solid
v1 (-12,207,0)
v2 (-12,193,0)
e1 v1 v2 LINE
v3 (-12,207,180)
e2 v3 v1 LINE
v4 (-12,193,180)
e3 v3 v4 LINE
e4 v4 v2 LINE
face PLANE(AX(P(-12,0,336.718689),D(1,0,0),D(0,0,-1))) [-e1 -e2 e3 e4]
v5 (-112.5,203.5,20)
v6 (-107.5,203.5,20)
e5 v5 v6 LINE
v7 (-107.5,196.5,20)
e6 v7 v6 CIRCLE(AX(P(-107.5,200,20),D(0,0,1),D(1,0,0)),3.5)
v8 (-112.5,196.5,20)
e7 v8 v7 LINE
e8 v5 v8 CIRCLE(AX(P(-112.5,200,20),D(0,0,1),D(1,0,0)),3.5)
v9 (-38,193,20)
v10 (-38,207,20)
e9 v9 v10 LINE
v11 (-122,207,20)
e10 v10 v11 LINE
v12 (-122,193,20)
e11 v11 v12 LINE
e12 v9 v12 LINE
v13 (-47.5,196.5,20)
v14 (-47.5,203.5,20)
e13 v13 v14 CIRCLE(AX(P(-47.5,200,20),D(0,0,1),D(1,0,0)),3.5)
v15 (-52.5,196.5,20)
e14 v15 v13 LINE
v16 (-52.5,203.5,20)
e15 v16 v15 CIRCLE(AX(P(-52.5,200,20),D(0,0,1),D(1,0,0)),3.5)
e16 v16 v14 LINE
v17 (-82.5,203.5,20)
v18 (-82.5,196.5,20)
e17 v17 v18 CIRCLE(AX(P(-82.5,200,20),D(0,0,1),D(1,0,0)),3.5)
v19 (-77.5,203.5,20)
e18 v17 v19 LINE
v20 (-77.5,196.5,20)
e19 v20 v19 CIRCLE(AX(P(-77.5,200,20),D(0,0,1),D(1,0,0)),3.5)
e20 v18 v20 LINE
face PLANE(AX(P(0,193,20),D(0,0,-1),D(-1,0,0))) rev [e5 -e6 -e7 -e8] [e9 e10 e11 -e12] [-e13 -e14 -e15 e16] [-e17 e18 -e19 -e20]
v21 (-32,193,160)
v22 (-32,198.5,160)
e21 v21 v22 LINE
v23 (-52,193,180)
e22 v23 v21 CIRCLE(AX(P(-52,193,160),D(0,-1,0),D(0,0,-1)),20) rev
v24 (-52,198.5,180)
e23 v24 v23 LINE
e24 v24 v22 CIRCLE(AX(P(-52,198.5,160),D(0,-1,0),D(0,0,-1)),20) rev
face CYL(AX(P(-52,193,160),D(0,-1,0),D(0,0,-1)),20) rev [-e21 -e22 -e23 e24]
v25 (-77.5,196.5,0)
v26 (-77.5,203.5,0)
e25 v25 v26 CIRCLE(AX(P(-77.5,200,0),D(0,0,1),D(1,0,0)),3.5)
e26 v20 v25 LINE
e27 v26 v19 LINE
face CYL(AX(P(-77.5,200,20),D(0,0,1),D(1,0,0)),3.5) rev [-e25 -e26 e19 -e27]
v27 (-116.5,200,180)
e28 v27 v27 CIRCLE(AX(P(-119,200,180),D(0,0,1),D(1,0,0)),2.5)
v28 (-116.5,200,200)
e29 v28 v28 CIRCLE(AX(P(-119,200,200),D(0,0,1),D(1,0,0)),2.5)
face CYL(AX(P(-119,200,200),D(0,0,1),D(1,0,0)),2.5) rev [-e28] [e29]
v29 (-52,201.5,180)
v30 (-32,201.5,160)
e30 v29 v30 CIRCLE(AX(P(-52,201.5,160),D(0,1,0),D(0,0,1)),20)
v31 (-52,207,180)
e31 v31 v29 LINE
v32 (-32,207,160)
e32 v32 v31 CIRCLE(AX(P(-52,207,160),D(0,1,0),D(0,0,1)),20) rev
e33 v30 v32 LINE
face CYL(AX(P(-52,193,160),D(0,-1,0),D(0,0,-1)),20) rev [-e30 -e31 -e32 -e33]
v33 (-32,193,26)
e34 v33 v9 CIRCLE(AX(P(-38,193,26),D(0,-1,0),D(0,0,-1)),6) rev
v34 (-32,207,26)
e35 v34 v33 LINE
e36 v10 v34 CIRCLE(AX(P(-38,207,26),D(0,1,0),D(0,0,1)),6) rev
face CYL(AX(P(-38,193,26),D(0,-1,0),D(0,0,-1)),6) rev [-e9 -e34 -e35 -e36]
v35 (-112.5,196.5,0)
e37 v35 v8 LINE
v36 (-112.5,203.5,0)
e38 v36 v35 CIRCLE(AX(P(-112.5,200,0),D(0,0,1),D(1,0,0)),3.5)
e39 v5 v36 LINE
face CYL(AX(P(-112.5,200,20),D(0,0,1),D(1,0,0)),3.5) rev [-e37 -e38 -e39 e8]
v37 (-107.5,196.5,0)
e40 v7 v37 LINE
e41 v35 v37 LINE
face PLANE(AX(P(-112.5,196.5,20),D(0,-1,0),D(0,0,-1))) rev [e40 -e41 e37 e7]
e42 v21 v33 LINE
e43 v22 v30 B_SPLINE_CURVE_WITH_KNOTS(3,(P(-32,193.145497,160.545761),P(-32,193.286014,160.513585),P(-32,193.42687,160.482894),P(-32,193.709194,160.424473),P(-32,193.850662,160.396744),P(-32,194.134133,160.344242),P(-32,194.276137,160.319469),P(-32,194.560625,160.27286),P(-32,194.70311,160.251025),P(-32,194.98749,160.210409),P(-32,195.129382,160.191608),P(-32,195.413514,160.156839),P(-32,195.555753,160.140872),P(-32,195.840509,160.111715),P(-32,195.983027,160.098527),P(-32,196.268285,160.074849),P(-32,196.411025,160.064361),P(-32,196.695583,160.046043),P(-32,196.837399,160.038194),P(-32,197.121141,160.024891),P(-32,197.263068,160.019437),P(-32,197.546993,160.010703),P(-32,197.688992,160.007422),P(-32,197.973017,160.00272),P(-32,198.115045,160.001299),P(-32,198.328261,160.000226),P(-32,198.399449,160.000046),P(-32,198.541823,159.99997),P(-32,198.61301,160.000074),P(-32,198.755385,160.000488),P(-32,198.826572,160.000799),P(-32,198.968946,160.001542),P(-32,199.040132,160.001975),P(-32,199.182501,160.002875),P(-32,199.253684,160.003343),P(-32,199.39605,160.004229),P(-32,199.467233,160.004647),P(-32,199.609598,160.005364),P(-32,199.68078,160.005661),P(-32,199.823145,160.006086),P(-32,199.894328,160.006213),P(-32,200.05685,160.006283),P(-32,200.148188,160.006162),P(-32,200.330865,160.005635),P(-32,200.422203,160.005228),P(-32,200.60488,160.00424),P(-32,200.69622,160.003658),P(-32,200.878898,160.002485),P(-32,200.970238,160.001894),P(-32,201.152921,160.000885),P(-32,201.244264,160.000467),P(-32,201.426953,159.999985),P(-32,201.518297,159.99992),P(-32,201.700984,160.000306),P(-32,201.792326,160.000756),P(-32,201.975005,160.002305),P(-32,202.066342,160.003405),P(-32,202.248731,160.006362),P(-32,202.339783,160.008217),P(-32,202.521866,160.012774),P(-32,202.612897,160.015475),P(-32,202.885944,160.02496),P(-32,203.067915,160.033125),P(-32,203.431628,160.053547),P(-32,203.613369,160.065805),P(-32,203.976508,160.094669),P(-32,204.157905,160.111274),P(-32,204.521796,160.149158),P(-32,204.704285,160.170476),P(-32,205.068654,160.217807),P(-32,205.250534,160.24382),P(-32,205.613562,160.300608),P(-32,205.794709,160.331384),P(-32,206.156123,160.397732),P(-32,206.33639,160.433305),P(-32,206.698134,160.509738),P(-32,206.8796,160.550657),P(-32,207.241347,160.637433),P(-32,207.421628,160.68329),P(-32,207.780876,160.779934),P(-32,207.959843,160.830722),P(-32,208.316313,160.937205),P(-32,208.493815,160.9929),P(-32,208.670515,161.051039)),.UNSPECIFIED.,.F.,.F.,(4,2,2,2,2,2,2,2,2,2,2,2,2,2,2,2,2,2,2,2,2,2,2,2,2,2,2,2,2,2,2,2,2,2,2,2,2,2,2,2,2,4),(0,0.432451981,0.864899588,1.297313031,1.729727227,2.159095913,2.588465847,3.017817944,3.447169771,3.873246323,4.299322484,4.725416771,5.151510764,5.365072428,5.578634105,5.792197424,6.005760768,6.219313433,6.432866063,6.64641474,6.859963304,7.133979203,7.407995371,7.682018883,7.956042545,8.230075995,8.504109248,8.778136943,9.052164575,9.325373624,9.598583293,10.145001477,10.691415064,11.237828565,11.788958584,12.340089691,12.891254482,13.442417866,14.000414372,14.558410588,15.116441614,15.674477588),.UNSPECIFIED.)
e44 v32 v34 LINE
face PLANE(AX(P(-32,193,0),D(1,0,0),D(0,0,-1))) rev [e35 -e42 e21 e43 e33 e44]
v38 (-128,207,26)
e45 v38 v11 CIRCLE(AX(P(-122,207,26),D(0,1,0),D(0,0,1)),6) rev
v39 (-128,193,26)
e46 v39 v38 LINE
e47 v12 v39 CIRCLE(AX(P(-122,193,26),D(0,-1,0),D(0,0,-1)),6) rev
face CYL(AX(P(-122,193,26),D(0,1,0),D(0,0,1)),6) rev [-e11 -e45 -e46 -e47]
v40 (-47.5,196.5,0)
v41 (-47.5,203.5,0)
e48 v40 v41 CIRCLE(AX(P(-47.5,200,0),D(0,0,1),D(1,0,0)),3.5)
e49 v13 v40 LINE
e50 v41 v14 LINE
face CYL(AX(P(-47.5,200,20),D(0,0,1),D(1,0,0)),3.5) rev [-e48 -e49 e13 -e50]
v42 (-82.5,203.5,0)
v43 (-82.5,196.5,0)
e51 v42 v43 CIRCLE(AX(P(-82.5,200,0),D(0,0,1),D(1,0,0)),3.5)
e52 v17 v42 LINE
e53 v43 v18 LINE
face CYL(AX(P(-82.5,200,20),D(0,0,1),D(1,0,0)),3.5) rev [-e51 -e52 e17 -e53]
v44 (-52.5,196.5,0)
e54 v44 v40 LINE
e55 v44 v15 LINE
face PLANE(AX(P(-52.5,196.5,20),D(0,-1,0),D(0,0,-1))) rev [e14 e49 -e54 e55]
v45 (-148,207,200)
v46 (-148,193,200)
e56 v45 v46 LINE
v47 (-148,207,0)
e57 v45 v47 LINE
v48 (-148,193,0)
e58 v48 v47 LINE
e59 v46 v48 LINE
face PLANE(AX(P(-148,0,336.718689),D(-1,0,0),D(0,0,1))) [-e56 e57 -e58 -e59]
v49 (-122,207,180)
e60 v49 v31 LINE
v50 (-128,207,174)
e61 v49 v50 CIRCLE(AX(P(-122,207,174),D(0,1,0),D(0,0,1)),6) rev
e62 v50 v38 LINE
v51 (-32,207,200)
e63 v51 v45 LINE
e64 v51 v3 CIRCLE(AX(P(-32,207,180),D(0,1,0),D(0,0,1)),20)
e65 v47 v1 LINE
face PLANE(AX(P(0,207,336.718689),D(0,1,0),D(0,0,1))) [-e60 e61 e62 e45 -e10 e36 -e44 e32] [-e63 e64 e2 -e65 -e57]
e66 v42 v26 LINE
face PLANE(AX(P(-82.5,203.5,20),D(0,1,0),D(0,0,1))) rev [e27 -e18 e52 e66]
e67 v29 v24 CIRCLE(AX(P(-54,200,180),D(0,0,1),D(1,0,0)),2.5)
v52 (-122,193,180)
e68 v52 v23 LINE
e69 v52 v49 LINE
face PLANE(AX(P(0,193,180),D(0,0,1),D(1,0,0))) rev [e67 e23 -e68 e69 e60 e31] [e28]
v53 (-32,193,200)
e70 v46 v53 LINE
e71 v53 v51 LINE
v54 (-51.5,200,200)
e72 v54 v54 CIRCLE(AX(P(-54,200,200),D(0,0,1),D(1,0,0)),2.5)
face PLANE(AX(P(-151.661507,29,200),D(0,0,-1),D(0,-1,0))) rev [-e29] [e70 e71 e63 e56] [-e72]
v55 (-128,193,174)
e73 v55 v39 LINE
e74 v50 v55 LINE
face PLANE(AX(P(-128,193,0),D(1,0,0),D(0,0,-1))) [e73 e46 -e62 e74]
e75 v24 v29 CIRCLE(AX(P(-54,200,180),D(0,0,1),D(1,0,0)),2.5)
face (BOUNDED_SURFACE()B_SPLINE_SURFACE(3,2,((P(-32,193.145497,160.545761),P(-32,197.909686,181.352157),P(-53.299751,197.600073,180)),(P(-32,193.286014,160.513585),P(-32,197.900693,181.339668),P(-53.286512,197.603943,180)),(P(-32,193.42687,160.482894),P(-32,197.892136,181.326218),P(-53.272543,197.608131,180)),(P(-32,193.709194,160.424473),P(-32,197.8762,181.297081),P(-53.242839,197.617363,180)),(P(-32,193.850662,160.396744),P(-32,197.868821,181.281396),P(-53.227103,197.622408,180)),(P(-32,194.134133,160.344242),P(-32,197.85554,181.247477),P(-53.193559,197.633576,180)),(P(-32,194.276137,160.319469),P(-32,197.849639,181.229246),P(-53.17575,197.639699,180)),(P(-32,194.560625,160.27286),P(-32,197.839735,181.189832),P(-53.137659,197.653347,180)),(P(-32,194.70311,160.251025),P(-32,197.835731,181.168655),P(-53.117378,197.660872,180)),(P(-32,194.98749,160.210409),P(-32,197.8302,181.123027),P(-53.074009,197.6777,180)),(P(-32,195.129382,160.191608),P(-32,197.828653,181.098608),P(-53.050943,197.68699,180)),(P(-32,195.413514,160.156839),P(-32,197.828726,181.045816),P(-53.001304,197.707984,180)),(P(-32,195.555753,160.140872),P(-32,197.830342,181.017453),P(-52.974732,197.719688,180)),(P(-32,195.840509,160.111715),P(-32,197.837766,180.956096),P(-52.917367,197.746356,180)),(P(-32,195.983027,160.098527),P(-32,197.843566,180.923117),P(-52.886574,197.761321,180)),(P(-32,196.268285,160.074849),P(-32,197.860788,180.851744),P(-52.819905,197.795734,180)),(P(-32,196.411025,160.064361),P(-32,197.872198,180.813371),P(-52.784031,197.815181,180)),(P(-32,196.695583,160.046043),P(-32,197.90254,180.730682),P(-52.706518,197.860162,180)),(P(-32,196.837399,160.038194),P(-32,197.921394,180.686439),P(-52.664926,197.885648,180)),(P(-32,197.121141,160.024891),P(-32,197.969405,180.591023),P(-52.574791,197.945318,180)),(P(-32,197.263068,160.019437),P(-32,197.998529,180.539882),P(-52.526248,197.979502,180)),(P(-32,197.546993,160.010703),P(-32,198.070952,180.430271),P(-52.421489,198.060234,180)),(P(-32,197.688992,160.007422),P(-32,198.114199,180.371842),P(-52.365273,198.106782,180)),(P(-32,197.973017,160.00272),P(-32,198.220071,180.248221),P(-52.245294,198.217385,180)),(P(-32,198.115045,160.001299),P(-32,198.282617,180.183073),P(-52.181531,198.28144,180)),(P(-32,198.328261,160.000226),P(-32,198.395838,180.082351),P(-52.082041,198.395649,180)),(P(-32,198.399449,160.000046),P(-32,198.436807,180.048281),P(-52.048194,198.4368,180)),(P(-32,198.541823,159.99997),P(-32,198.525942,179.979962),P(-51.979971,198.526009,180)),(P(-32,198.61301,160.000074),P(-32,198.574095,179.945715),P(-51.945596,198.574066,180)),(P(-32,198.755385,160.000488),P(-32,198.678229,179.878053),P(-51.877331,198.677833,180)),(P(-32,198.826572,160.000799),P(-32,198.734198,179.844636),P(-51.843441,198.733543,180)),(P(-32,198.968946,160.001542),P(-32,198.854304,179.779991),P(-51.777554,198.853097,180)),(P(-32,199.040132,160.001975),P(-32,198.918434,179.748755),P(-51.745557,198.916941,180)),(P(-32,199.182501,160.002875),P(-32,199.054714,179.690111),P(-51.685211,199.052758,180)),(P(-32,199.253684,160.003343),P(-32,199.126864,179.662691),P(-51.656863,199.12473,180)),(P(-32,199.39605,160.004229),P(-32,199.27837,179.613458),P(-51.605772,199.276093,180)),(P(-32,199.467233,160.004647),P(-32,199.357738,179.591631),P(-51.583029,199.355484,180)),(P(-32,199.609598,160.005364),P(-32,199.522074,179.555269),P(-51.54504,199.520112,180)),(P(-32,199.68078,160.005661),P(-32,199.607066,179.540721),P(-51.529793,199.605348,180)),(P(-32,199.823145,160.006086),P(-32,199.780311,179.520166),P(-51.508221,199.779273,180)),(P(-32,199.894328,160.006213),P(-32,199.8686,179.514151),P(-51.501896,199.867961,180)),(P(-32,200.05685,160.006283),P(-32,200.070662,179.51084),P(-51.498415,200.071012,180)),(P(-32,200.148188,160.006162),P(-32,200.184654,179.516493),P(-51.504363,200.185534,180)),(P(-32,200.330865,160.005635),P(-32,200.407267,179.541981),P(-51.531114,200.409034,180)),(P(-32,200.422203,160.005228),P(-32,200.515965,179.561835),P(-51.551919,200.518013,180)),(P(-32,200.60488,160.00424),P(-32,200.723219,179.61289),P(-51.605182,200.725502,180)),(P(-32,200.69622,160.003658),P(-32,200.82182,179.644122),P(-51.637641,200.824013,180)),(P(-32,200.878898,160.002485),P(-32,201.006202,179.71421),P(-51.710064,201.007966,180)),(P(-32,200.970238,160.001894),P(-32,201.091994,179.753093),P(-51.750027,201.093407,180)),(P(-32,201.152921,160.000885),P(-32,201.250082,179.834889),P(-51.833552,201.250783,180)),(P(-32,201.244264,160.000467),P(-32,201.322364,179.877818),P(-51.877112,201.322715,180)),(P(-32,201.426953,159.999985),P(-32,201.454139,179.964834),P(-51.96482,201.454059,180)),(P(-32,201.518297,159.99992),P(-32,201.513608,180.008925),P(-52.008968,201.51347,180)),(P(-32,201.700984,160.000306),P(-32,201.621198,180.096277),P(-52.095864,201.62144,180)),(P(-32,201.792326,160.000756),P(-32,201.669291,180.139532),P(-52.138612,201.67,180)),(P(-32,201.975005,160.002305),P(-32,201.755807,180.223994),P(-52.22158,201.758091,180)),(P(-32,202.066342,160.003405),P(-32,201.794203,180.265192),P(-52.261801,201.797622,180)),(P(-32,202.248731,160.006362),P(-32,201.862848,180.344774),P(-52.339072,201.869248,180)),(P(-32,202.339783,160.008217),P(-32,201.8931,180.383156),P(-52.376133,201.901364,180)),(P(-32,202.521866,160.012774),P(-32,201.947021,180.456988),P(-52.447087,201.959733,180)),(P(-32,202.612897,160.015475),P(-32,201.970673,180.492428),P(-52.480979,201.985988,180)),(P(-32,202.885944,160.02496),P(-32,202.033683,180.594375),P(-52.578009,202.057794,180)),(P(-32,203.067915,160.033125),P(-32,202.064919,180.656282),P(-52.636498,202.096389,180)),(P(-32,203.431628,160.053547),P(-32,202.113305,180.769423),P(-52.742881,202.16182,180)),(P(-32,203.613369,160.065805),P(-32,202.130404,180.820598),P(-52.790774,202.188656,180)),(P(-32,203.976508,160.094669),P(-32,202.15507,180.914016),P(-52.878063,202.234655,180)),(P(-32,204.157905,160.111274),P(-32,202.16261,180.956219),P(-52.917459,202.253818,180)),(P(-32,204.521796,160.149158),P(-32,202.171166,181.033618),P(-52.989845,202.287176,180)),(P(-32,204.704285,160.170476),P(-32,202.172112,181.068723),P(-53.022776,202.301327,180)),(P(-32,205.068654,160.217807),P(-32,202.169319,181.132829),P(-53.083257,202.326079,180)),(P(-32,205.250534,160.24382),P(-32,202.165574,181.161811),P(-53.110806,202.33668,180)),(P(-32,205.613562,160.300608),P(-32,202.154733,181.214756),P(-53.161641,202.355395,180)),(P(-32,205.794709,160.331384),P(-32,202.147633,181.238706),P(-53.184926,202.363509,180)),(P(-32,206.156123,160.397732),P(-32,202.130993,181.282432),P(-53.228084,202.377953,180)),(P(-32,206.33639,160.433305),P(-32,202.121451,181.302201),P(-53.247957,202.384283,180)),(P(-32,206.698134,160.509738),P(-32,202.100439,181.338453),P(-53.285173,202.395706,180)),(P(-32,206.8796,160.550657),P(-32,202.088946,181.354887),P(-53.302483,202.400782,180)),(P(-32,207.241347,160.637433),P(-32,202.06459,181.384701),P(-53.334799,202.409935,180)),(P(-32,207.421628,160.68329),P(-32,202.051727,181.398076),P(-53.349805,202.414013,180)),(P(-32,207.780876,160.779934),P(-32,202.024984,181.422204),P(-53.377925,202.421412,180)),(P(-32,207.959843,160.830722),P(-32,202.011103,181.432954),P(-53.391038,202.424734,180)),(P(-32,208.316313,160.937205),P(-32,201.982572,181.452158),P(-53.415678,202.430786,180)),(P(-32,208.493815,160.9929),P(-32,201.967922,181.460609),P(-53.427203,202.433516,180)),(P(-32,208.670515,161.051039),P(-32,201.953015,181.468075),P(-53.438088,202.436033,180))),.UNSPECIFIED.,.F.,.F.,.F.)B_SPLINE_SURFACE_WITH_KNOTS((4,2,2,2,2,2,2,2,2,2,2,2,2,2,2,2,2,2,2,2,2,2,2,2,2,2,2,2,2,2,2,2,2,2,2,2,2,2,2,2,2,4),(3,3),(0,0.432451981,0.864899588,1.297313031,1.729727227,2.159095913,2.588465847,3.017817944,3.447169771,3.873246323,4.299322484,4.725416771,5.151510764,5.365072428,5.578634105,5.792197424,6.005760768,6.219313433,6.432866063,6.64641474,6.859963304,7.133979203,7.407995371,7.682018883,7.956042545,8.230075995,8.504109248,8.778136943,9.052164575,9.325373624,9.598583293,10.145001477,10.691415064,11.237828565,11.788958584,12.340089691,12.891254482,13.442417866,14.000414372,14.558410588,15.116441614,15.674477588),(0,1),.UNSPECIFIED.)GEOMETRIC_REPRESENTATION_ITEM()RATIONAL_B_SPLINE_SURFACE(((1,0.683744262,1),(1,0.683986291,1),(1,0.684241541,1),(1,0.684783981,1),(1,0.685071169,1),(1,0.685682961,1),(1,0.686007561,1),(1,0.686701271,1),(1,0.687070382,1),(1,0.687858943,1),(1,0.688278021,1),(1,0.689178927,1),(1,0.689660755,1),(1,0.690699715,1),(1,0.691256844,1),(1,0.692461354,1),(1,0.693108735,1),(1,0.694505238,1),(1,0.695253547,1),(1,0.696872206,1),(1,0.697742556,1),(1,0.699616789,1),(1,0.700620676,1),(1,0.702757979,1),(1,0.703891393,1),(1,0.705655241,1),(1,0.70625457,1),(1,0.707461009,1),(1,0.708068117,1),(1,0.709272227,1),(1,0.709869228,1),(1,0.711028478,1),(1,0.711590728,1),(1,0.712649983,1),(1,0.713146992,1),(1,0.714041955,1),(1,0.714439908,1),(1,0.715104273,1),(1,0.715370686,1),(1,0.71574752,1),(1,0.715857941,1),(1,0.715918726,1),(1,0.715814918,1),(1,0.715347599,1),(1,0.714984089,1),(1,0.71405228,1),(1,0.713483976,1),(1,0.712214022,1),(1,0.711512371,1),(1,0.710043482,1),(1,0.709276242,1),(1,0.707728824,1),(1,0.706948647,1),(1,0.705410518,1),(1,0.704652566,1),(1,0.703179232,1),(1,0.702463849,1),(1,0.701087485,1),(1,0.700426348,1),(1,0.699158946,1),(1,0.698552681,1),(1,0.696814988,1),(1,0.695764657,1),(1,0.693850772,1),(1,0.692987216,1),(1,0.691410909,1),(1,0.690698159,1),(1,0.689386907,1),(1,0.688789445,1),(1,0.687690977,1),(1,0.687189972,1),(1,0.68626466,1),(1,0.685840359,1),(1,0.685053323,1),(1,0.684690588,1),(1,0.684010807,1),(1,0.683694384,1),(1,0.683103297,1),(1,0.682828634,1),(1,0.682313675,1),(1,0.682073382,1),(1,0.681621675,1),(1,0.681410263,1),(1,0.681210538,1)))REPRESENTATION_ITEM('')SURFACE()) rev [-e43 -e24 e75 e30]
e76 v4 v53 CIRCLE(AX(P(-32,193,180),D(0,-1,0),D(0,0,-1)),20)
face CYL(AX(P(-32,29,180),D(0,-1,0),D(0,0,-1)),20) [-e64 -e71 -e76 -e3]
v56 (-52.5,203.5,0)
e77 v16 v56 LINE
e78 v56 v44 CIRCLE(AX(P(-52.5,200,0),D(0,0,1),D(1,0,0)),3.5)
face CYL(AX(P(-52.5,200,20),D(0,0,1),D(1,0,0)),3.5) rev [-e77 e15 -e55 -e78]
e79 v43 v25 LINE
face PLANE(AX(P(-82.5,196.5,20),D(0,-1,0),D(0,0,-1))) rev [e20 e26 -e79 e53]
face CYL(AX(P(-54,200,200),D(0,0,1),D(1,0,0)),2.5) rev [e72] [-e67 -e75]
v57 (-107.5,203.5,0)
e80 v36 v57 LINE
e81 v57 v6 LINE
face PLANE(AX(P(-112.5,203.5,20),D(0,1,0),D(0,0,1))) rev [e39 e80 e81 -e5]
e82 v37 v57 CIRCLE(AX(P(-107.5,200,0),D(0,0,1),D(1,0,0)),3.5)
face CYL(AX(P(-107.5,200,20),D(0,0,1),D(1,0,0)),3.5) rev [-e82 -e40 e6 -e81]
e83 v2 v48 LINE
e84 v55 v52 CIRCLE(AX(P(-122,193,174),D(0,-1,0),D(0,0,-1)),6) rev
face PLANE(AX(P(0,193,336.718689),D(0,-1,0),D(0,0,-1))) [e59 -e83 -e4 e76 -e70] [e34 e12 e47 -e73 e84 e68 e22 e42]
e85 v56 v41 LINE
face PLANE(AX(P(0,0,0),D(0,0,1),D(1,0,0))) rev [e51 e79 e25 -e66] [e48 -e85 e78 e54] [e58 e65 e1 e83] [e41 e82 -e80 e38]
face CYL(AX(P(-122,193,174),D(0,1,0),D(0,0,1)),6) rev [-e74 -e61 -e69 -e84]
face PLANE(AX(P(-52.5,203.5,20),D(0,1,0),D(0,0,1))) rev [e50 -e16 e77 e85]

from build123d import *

# Parameters (mm, degrees)
BOSS_EXTRUDE1_DEPTH       = 200
CUT_EXTRUDE1_DEPTH        = 250.198715888
F_6_0MM_DOWEL_SLOT1_DEPTH = 20
M6X1_0_TAPPED_HOLE1_D     = 5
M6X1_0_TAPPED_HOLE1_DEPTH = 21.497848452
M6X1_0_TAPPED_HOLE1_TIP   = 1.502151548
FILLET1_R                 = 6
FILLET2_R                 = 20


# Read off the part's stored shape, not the designer's step: Ø6.0mm Dowel Slot1
with BuildPart() as part:
    # Sketch1 → Boss-Extrude1 (new body)
    with BuildSketch(Plane.XY):
        Polygon((-21, 207), (-148, 207), (-148, 197.5), (-148, 193), (-24, 193), (-12, 193), (-12, 207), align=None)
    extrude(amount=BOSS_EXTRUDE1_DEPTH)

    # Sketch3 → Cut-Extrude1 (cut, through all)
    with BuildSketch(Plane(origin=(0, 207, 0), x_dir=(1, 0, 0), z_dir=(0, 1, 0))):
        Polygon((-128, -20), (-128, -30), (-128, -108), (-128, -180), (-118, -180), (-54, -180), (-32, -180), (-32, -20), align=None)
    extrude(amount=-CUT_EXTRUDE1_DEPTH, mode=Mode.SUBTRACT)

    # Ø6.0mm Dowel Slot1 outline → Ø6.0mm Dowel Slot1 (cut)
    with BuildSketch(Plane.XY):
        with BuildLine():
            Line((-52.5, 196.5), (-47.5, 196.5))
            ThreePointArc((-47.5, 196.5), (-44, 200), (-47.5, 203.5))
            Line((-47.5, 203.5), (-52.5, 203.5))
            ThreePointArc((-52.5, 203.5), (-56, 200), (-52.5, 196.5))
        make_face()
        with BuildLine():
            ThreePointArc((-77.5, 196.5), (-74, 200), (-77.5, 203.5))
            Line((-77.5, 203.5), (-82.5, 203.5))
            ThreePointArc((-82.5, 203.5), (-86, 200), (-82.5, 196.5))
            Line((-82.5, 196.5), (-77.5, 196.5))
        make_face()
        with BuildLine():
            ThreePointArc((-107.5, 196.5), (-104, 200), (-107.5, 203.5))
            Line((-107.5, 203.5), (-112.5, 203.5))
            ThreePointArc((-112.5, 203.5), (-116, 200), (-112.5, 196.5))
            Line((-112.5, 196.5), (-107.5, 196.5))
        make_face()
    extrude(amount=F_6_0MM_DOWEL_SLOT1_DEPTH, mode=Mode.SUBTRACT)

    # M6x1.0 Tapped Hole1
    with Locations(Plane.XY.offset(200)):
        with Locations((-119, 200), (-54, 200)):
            Hole(M6X1_0_TAPPED_HOLE1_D / 2, depth=M6X1_0_TAPPED_HOLE1_DEPTH)
            with Locations((0, 0, -(M6X1_0_TAPPED_HOLE1_DEPTH + M6X1_0_TAPPED_HOLE1_TIP / 2))):  # 118° drill point
                Cone(0, M6X1_0_TAPPED_HOLE1_D / 2, M6X1_0_TAPPED_HOLE1_TIP, mode=Mode.SUBTRACT)

    # Fillet1
    fillet1_edges = [part.edges().sort_by_distance(p)[0] for p in [
        (-128, 200, 180),
        (-128, 200, 20),
        (-32, 200, 20),
    ]]
    fillet(fillet1_edges, radius=FILLET1_R)

    # Fillet2
    fillet2_edges = [part.edges().sort_by_distance(p)[0] for p in [
        (-12, 200, 200),
        (-32, 200, 180),
    ]]
    fillet(fillet2_edges, radius=FILLET2_R)


solid = part.part
